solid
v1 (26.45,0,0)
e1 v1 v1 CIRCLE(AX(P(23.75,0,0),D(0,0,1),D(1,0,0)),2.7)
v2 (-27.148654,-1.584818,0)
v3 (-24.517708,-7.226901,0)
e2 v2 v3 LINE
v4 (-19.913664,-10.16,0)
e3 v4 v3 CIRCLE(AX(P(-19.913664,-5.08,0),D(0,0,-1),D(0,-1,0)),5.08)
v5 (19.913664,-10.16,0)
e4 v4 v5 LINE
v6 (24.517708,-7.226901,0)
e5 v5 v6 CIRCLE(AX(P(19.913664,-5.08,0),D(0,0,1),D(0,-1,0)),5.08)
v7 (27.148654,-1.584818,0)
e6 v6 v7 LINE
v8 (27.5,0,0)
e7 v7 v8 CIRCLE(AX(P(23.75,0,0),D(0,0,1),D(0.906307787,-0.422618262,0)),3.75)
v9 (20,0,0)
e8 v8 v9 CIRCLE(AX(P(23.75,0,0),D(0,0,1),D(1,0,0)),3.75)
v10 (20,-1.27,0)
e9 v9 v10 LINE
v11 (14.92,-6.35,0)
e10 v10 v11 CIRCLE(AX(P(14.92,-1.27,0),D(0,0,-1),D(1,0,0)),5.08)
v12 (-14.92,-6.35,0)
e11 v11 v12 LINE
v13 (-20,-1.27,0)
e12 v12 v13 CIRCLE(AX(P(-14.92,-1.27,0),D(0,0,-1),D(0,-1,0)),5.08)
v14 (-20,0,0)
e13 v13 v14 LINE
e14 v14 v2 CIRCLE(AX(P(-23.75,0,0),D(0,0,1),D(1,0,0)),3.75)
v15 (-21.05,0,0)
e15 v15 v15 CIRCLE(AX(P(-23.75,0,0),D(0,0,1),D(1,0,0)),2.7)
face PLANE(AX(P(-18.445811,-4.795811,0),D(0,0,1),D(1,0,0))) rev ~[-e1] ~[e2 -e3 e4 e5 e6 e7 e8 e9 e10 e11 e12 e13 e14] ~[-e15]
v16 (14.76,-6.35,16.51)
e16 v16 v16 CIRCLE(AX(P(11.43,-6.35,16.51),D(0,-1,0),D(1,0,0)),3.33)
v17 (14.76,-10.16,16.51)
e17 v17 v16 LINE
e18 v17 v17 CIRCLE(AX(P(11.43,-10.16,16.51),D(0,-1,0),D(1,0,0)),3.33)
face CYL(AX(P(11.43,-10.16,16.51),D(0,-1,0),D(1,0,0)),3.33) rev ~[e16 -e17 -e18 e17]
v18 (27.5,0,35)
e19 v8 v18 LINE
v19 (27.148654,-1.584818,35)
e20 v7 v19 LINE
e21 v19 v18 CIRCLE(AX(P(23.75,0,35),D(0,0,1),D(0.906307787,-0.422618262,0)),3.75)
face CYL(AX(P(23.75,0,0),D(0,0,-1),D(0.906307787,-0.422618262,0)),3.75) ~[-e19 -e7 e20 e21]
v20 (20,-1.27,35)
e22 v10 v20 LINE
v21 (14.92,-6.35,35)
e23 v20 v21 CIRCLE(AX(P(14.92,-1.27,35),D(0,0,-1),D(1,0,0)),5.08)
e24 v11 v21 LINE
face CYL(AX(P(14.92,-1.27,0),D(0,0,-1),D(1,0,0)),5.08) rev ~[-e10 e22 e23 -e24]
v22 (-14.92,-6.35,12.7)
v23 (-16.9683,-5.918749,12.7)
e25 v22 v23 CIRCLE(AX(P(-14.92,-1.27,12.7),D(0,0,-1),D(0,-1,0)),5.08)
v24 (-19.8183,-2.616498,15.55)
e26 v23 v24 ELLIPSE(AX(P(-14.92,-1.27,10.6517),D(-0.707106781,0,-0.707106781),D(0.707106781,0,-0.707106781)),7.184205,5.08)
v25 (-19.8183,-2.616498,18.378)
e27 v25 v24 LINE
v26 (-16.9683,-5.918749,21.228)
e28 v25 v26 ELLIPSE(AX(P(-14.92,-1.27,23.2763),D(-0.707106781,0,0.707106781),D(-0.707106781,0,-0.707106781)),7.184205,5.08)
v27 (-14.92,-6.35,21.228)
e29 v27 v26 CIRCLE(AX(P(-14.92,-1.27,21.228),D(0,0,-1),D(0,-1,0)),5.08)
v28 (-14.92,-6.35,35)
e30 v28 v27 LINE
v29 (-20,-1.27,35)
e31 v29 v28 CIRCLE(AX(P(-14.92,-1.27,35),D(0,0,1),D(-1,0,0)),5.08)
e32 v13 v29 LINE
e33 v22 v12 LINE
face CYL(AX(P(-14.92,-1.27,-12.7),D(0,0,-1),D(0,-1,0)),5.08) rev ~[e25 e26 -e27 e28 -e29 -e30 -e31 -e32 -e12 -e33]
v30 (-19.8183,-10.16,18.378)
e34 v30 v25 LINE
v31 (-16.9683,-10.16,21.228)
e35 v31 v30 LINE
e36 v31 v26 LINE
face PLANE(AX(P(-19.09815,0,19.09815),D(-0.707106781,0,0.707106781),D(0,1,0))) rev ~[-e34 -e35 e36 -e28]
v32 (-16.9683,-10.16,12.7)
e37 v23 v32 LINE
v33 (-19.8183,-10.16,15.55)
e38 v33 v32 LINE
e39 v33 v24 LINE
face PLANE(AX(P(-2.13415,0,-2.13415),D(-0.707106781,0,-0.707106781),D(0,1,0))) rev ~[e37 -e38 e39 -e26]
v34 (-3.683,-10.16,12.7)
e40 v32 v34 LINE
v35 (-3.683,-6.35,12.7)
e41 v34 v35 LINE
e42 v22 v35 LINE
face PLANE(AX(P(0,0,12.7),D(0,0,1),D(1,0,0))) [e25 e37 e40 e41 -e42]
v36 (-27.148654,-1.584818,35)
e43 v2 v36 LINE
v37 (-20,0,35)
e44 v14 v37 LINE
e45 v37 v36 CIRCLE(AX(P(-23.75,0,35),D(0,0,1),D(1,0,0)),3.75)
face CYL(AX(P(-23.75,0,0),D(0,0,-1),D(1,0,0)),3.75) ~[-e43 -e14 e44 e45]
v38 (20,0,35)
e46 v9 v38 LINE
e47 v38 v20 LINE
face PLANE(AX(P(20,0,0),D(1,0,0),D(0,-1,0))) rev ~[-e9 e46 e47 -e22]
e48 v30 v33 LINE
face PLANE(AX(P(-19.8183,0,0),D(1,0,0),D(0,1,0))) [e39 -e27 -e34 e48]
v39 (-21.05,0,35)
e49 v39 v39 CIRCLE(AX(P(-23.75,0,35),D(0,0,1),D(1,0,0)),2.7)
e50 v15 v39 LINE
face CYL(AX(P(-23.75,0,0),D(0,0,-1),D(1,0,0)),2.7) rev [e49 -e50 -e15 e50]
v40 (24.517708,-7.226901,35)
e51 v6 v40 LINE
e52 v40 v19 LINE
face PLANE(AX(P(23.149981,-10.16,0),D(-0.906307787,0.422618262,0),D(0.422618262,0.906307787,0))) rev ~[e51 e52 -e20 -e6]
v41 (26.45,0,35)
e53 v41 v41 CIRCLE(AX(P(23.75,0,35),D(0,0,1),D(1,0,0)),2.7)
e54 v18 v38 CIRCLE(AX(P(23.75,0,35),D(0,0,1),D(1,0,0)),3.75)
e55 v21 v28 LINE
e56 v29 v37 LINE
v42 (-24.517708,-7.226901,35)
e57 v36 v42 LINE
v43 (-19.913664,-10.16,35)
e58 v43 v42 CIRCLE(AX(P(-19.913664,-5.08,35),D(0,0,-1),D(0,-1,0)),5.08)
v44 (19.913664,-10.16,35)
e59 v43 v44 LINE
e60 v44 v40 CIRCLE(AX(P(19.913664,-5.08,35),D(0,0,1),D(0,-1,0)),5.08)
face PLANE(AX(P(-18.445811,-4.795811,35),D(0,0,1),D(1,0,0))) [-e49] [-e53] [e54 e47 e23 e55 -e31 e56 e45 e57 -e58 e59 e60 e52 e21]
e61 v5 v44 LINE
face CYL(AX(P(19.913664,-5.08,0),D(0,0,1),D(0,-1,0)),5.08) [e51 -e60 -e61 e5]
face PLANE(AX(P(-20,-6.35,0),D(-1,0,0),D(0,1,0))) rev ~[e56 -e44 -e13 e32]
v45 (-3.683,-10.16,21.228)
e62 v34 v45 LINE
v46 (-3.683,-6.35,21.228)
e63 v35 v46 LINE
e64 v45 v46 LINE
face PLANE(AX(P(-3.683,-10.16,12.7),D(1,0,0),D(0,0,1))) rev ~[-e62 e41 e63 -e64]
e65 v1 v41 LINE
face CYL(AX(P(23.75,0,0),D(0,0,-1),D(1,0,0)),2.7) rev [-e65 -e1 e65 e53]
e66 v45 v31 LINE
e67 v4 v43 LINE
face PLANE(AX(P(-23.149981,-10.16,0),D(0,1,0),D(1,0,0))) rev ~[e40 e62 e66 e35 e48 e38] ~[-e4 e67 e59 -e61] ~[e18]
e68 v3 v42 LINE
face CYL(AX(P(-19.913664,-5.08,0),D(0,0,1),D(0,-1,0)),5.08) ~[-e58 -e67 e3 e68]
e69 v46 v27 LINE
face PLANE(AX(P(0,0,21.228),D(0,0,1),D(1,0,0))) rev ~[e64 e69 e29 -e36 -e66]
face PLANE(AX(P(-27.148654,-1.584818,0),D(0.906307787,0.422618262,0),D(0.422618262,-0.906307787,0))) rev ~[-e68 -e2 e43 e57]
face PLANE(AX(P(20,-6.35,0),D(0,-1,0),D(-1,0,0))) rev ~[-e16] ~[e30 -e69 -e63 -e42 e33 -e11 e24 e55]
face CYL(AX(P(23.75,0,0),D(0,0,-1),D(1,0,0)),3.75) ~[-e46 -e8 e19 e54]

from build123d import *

# Parameters (mm, degrees)
F0_R         = 2.7
F1_DEPTH     = 35
F2_R         = 3.33
F3_DEPTH     = 13.911
F4_T1_DEPTH  = 35
F4_T6_DEPTH  = 47.7
F4_T11_DEPTH = 60.4
F4_T17_DEPTH = 47.7
F4_T23_DEPTH = 47.7
F4_T28_DEPTH = 60.4
F5_R         = 5.08


# Not quite as in the source:
# - a fillet or chamfer that OpenCascade refuses, or shapes differently, is made with other operations: its cross-section is extruded or revolved along the edge and cut away or added


with BuildPart() as f1:
    # F0 (on Top) → F1 (new body)
    with BuildSketch(Plane.XY):
        with BuildLine():
            Line((-20, -6.35), (-20, 0))
            ThreePointArc((-20, 0), (-22.9383514477, -3.6611100267), (-27.1486542014, -1.5848184815))
            Line((-27.1486542014, -1.5848184815), (-23.1499813893, -10.16))
            Line((-23.1499813893, -10.16), (23.1499813893, -10.16))
            Line((23.1499813893, -10.16), (27.1486542014, -1.5848184815))
            ThreePointArc((27.1486542014, -1.5848184815), (22.9383514477, -3.6611100267), (20, 0))
            Line((20, 0), (20, -6.35))
            Line((20, -6.35), (-20, -6.35))
        make_face()
        with BuildLine():
            ThreePointArc((-27.1486542014, -1.5848184815), (-22.9383514477, -3.6611100267), (-20, 0))
            ThreePointArc((-20, 0), (-24.5616485523, 3.6611100267), (-27.1486542014, -1.5848184815))
        make_face()
        with Locations((-23.75, 0)):
            Circle(F0_R, mode=Mode.SUBTRACT)
        with BuildLine():
            ThreePointArc((27.5, 0), (23.75, 3.75), (20, 0))
            ThreePointArc((20, 0), (22.9383514477, -3.6611100267), (27.1486542014, -1.5848184815))
            ThreePointArc((27.1486542014, -1.5848184815), (27.4111100267, -0.8116485523), (27.5, 0))
        make_face()
        with Locations((23.75, 0)):
            Circle(F0_R, mode=Mode.SUBTRACT)
    extrude(amount=F1_DEPTH)

    # F2 (on face) → F3 (cut, through all)
    with BuildSketch(Plane.XZ.offset(10.16)):
        Polygon((-3.683, 12.7), (-3.683, 21.228), (-16.9683, 21.228), (-19.8183, 18.378), (-19.8183, 15.55), (-16.9683, 12.7), align=None)
        with Locations((11.43, 16.51)):
            Circle(F2_R)
    extrude(amount=-F3_DEPTH, mode=Mode.SUBTRACT)

    # F4: fillet of radius 5.08 on 2 edges, made by hand

    # F4_s2 → F4_t1 (join)
    with BuildSketch(Plane.XY):
        with BuildLine():
            ThreePointArc((20, -1.27), (18.5121024484, -4.8621024484), (14.92, -6.35))
            Line((14.92, -6.35), (20, -6.35))
            Line((20, -6.35), (20, -1.27))
        make_face()
    extrude(amount=F4_T1_DEPTH)


with BuildPart() as f4_tool4:
    # F4_s5 → F4_t6 (new body)
    with BuildSketch(Plane.XY):
        with BuildLine():
            ThreePointArc((-14.92, -6.35), (-18.5121024484, -4.8621024484), (-20, -1.27))
            Line((-20, -1.27), (-20, -6.35))
            Line((-20, -6.35), (-14.92, -6.35))
        make_face()
    extrude(amount=F4_T6_DEPTH)

    split(bisect_by=Plane(origin=(-2.13415, 0, -2.13415), x_dir=(0, 1, 0), z_dir=(-0.7071067812, 0, -0.7071067812)), keep=Keep.TOP)


with BuildPart() as f1_1:
    add(f1.part)

    # F4_t3: union F4_tool4
    add(f4_tool4.part)


with BuildPart() as f4_tool9:
    # F4_s10 → F4_t11 (new body)
    with BuildSketch(Plane.XY.offset(-12.7)):
        with BuildLine():
            ThreePointArc((-14.92, -6.35), (-18.5121024484, -4.8621024484), (-20, -1.27))
            Line((-20, -1.27), (-20, -6.35))
            Line((-20, -6.35), (-14.92, -6.35))
        make_face()
    extrude(amount=F4_T11_DEPTH)

    split(bisect_by=Plane.XY.offset(12.7), keep=Keep.BOTTOM)

    split(bisect_by=Plane(origin=(-2.13415, 0, -2.13415), x_dir=(0, 1, 0), z_dir=(0.7071067812, 0, 0.7071067812)), keep=Keep.TOP)


with BuildPart() as f1_2:
    add(f1_1.part)

    # F4_t8: union F4_tool9
    add(f4_tool9.part)


with BuildPart() as f4_tool15:
    # F4_s16 → F4_t17 (new body)
    with BuildSketch(Plane.XY.offset(-12.7)):
        with BuildLine():
            ThreePointArc((-14.92, -6.35), (-18.5121024484, -4.8621024484), (-20, -1.27))
            Line((-20, -1.27), (-20, -6.35))
            Line((-20, -6.35), (-14.92, -6.35))
        make_face()
    extrude(amount=F4_T17_DEPTH)

    split(bisect_by=Plane(origin=(-2.13415, 0, -2.13415), x_dir=(0, 1, 0), z_dir=(0.7071067812, 0, 0.7071067812)), keep=Keep.TOP)

    split(bisect_by=Plane.YZ.offset(-19.8183), keep=Keep.BOTTOM)


with BuildPart() as f1_3:
    add(f1_2.part)

    # F4_t14: union F4_tool15
    add(f4_tool15.part)


with BuildPart() as f4_tool21:
    # F4_s22 → F4_t23 (new body)
    with BuildSketch(Plane.XY.offset(-12.7)):
        with BuildLine():
            ThreePointArc((-14.92, -6.35), (-18.5121024484, -4.8621024484), (-20, -1.27))
            Line((-20, -1.27), (-20, -6.35))
            Line((-20, -6.35), (-14.92, -6.35))
        make_face()
    extrude(amount=F4_T23_DEPTH)

    split(bisect_by=Plane(origin=(-19.09815, 0, 19.09815), x_dir=(0, 1, 0), z_dir=(-0.7071067812, 0, 0.7071067812)), keep=Keep.TOP)


with BuildPart() as f1_4:
    add(f1_3.part)

    # F4_t20: union F4_tool21
    add(f4_tool21.part)


with BuildPart() as f4_tool26:
    # F4_s27 → F4_t28 (new body)
    with BuildSketch(Plane.XY.offset(-12.7)):
        with BuildLine():
            ThreePointArc((-14.92, -6.35), (-18.5121024484, -4.8621024484), (-20, -1.27))
            Line((-20, -1.27), (-20, -6.35))
            Line((-20, -6.35), (-14.92, -6.35))
        make_face()
    extrude(amount=F4_T28_DEPTH)

    split(bisect_by=Plane(origin=(-19.09815, 0, 19.09815), x_dir=(0, 1, 0), z_dir=(0.7071067812, 0, -0.7071067812)), keep=Keep.TOP)

    split(bisect_by=Plane.XY.offset(21.228), keep=Keep.TOP)


with BuildPart() as f1_5:
    add(f1_4.part)

    # F4_t25: union F4_tool26
    add(f4_tool26.part)

    # F5
    f5_edges = [f1_5.edges().sort_by_distance(p)[0] for p in [
        (-23.149981, -10.16, 17.5),
        (23.149981, -10.16, 17.5),
    ]]
    fillet(f5_edges, radius=F5_R)


solid = f1_5.part
